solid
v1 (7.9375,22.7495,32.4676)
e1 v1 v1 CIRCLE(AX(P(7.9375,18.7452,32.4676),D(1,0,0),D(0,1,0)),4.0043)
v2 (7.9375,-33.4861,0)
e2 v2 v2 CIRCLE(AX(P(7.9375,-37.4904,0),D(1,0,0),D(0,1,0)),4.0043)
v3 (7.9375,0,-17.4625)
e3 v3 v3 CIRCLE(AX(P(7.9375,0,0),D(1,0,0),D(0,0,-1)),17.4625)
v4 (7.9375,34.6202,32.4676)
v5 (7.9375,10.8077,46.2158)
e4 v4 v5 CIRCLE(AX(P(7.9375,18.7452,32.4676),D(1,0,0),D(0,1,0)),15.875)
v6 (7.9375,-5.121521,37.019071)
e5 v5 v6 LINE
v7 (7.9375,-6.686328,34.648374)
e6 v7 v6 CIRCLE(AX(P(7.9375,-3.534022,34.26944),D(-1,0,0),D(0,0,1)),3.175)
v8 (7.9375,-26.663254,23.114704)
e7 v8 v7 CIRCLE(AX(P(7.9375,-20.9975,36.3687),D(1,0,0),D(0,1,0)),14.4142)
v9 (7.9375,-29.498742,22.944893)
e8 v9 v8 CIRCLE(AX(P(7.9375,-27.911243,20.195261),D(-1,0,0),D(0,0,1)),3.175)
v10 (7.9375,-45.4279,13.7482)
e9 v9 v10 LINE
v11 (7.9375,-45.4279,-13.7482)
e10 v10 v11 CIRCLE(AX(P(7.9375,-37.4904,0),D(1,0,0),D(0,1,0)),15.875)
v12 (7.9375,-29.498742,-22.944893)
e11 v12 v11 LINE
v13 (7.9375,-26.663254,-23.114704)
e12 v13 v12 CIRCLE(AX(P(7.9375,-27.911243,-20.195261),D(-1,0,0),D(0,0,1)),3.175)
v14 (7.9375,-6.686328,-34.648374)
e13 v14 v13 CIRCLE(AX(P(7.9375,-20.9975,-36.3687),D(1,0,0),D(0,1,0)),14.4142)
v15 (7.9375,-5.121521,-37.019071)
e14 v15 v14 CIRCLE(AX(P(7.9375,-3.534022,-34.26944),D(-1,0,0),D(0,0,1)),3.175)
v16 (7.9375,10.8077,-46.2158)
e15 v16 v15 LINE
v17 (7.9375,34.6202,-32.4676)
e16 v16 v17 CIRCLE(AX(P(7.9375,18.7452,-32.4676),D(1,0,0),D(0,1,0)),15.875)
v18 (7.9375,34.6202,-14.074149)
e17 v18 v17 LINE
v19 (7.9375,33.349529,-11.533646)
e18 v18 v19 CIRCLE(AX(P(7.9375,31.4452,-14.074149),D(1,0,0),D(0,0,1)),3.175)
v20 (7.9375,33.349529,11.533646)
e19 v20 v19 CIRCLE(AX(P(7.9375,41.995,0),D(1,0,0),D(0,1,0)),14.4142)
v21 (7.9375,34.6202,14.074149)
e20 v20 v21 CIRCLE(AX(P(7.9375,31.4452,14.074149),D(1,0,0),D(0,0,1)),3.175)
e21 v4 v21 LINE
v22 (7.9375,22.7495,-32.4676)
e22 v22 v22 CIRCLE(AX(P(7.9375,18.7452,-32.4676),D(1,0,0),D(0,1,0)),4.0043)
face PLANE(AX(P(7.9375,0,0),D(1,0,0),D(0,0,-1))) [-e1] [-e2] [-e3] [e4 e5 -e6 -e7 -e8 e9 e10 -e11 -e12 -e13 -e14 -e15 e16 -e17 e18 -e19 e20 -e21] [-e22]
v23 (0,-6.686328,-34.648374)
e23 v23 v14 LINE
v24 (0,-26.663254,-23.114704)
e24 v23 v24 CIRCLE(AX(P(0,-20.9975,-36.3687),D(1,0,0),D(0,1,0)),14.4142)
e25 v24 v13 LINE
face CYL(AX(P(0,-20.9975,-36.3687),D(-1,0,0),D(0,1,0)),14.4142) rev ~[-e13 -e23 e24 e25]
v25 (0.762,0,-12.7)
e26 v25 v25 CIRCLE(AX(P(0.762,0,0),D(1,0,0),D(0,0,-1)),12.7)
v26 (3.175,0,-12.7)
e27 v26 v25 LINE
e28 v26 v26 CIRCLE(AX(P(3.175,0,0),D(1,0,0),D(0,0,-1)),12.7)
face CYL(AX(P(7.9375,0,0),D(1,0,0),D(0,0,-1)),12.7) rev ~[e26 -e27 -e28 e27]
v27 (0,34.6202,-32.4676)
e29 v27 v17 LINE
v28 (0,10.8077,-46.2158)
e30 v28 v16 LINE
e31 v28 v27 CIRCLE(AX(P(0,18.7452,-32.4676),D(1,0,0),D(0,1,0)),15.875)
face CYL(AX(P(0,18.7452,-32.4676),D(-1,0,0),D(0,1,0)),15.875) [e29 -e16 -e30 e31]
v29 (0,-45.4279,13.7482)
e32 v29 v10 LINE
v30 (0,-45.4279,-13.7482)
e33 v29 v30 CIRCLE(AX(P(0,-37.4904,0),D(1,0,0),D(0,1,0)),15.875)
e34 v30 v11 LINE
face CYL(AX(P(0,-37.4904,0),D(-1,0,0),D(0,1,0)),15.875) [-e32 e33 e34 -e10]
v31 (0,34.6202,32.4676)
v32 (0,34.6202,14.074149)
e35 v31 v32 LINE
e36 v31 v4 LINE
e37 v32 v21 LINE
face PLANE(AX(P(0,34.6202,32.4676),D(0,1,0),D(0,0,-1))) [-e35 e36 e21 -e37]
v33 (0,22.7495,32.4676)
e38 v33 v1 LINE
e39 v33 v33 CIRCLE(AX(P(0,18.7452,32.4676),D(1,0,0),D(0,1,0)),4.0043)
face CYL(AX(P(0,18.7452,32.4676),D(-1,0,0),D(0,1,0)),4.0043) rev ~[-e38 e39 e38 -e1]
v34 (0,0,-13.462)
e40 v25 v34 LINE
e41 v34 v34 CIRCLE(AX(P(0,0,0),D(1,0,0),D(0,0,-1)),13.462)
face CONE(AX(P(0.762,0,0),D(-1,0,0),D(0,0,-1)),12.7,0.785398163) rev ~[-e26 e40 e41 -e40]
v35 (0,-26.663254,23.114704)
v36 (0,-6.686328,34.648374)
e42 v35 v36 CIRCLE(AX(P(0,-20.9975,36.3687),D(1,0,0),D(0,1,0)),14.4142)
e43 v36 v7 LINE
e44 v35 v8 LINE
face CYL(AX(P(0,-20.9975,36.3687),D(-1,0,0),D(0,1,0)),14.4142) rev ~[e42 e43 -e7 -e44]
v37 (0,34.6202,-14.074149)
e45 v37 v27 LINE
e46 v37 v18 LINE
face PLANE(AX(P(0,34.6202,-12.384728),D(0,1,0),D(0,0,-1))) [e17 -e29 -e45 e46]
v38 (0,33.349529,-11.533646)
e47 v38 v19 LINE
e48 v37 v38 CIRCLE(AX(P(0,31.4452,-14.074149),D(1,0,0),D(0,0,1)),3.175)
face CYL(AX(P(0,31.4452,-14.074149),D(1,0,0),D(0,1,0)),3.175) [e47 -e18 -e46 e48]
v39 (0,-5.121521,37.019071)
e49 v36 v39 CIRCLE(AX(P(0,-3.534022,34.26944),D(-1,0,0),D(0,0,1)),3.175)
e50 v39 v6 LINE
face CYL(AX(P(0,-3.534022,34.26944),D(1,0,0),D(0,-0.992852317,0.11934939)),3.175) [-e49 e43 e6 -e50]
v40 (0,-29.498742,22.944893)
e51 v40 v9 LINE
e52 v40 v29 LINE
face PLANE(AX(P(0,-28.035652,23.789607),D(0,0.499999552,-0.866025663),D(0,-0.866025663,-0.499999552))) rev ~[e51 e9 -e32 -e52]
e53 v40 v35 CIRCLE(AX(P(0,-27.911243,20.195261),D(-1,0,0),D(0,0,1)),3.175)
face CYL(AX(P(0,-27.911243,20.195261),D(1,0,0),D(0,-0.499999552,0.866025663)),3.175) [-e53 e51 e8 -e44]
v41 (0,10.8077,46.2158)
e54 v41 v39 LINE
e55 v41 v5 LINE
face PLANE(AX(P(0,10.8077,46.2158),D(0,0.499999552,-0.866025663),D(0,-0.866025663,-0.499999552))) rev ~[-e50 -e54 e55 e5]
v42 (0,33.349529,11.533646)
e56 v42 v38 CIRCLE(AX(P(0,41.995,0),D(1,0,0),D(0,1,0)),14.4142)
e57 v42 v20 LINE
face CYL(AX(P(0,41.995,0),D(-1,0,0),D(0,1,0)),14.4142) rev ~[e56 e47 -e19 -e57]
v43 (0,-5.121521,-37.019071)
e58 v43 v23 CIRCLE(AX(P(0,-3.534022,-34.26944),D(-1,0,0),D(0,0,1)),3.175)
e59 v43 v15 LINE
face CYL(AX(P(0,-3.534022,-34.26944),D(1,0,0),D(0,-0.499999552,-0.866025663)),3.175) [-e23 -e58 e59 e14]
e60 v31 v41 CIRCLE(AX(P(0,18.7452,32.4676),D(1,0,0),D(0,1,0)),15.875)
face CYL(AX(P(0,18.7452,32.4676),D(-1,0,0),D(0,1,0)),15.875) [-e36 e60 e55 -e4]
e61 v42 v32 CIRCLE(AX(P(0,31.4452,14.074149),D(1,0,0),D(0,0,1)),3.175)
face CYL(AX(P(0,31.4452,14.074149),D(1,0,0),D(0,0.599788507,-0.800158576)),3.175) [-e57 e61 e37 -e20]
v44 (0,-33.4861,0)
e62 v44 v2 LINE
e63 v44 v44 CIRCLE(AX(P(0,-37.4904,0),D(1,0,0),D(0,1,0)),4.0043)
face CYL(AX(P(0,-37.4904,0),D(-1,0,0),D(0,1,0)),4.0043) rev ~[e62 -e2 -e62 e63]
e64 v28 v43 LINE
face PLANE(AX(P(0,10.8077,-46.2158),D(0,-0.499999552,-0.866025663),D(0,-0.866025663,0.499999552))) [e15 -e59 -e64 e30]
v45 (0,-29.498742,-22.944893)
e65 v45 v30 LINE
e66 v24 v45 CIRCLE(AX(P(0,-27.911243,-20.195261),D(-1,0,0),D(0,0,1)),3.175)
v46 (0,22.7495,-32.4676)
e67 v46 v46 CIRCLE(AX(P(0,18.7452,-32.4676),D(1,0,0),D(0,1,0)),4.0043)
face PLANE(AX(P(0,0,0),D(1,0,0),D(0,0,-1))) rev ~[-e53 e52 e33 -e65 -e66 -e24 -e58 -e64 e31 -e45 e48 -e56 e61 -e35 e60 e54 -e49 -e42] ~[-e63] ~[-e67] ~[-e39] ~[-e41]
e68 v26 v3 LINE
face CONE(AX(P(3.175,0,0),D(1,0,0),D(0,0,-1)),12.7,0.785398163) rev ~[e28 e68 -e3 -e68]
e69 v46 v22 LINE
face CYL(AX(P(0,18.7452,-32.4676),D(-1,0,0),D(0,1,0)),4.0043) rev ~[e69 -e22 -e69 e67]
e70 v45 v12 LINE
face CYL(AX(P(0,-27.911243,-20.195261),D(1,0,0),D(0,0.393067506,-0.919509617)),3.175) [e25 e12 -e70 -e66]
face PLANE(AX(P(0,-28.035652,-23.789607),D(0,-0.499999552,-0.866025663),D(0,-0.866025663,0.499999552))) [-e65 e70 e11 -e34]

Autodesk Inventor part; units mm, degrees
ref_plane "YZ Plane" through (0, 0, 0) normal (1, 0, 0) x (0, 1, 0)
ref_plane "XZ Plane" through (0, 0, 0) normal (0, 1, 0) x (-1, 0, 0)
ref_plane "XY Plane" through (0, 0, 0) normal (0, 0, 1) x (1, 0, 0)
sketch "Sketch1" plane through (0, 0, 0) normal (1, 0, 0) x (0, 1, 0)
  circle A0 centre (0, 0) radius 15.875
  circle A1 centre (18.7452, -32.4676) radius 4.0043
  circle A2 centre (18.7452, -32.4676) radius 15.875
  circle A3 centre (-37.4904, 0) radius 4.0043
  circle A4 centre (-37.4904, 0) radius 15.875
  circle A5 centre (18.7452, 32.4676) radius 15.875
  circle A6 centre (18.7452, 32.4676) radius 4.0043
  circle A7 centre (18.7452, -32.4676) radius 4.0043
  circle A8 centre (18.7452, -32.4676) radius 15.875
  circle A9 centre (0, 0) radius 15.875
  circle A10 centre (-37.4904, 0) radius 4.0043
  circle A11 centre (-37.4904, 0) radius 15.875
  circle A12 centre (18.7452, 32.4676) radius 4.0043
  circle A13 centre (18.7452, 32.4676) radius 15.875
  line L0 (34.6202, 32.4676) -> (34.6202, -32.4676)
  line L1 (10.8077, -46.2158) -> (-45.4279, -13.7482)
  line L2 (10.8077, 46.2158) -> (-45.4279, 13.7482)
  circle A14 centre (18.7452, 32.4676) radius 15.875
  circle A15 centre (-37.4904, 0) radius 15.875
  circle A16 centre (18.7452, -32.4676) radius 15.875
  circle A17 centre (41.995, 0) radius 14.4142
  circle A18 centre (-20.9975, 36.3687) radius 14.4142
  circle A19 centre (-20.9975, -36.3687) radius 14.4142
  point P0 (-28.0356, -23.7896)
  point P1 (-6.5846, -36.1743)
  point P2 (10.8077, -46.2158)
  point P3 (34.6202, -12.3847)
  point P4 (34.6202, 12.3847)
  point P5 (-6.5846, 36.1743)
  point P6 (-28.0356, 23.7896)
  point P7 (-45.4279, 13.7482)
  point P8 (-45.4279, -13.7482)
  dimension "d28" = 360
  dimension "d34" = 31.75
  dimension "d35" = 28.8284
  dimension "d36" = 8.0086
  dimension "d37" = 31.75
  dimension "d38" = 31.75
  dimension "d39" = 60
  dimension "d40" = 60
  dimension "d41" = 7.3748
  dimension "d42" = 55.6177
  dimension "d43" = 55.6177
  dimension "d44" = 0
  dimension "d45" = 41.2048
  dimension "d46" = 0
  dimension "d47" = 62.6558
  dimension "d48" = 80.0481
  dimension "d49" = 0
  dimension "d50" = 80.0481
  dimension "d51" = 15.875
  dimension "d52" = 15.875
  dimension "d53" = 23.8125
  dimension "d54" = 80.0481
  dimension "d55" = 34.6202
  dimension "d56" = 34.6202
  dimension "d57" = 41.2048
  dimension "d58" = 0
  dimension "d59" = 41.2048
  dimension "d60" = 62.6558
  dimension "d61" = 62.6558
  dimension "d62" = 0
  dimension "d63" = 62.6558
  dimension "d64" = 41.2048
  dimension "d65" = 72.1106
  dimension "d66" = 80.0481
  dimension "d67" = 0
  dimension "d68" = 80.0481
  dimension "d69" = 23.8125
extrude "Extrusion1" add sketch "Sketch1" along normal blind 7.9375 contours A2 | A2 L1 A19 A4 L2 A18 A5 L0 A17 | A5 | A4
fillet "Fillet2" radius 3.175 6 edges at (3.9688, 34.6202, 12.3847) (3.9688, 34.6202, -12.3847) (3.9688, -6.5846, 36.1743) (3.9688, -28.0356, 23.7896) (3.9688, -6.5846, -36.1743) (3.9688, -28.0356, -23.7896)
sketch "Sketch5" plane through (7.9375, 0, 0) normal (1, 0, 0) x (0, 0, -1)
  circle A0 centre (0, 0) radius 15.875
  circle A1 centre (0, 0) radius 12.7
  dimension "d70" = 25.4
extrude "Extrusion3" add sketch "Sketch5" against normal up to surface (7.9375 mm away)
chamfer "Chamfer5" distance 4.7625 angle 45 1 edges at (7.9375, 0, 12.7)
chamfer "Chamfer7" distance 0.762 angle 45 1 edges at (0, 0, 12.7)
properties part number "DTR-5"
